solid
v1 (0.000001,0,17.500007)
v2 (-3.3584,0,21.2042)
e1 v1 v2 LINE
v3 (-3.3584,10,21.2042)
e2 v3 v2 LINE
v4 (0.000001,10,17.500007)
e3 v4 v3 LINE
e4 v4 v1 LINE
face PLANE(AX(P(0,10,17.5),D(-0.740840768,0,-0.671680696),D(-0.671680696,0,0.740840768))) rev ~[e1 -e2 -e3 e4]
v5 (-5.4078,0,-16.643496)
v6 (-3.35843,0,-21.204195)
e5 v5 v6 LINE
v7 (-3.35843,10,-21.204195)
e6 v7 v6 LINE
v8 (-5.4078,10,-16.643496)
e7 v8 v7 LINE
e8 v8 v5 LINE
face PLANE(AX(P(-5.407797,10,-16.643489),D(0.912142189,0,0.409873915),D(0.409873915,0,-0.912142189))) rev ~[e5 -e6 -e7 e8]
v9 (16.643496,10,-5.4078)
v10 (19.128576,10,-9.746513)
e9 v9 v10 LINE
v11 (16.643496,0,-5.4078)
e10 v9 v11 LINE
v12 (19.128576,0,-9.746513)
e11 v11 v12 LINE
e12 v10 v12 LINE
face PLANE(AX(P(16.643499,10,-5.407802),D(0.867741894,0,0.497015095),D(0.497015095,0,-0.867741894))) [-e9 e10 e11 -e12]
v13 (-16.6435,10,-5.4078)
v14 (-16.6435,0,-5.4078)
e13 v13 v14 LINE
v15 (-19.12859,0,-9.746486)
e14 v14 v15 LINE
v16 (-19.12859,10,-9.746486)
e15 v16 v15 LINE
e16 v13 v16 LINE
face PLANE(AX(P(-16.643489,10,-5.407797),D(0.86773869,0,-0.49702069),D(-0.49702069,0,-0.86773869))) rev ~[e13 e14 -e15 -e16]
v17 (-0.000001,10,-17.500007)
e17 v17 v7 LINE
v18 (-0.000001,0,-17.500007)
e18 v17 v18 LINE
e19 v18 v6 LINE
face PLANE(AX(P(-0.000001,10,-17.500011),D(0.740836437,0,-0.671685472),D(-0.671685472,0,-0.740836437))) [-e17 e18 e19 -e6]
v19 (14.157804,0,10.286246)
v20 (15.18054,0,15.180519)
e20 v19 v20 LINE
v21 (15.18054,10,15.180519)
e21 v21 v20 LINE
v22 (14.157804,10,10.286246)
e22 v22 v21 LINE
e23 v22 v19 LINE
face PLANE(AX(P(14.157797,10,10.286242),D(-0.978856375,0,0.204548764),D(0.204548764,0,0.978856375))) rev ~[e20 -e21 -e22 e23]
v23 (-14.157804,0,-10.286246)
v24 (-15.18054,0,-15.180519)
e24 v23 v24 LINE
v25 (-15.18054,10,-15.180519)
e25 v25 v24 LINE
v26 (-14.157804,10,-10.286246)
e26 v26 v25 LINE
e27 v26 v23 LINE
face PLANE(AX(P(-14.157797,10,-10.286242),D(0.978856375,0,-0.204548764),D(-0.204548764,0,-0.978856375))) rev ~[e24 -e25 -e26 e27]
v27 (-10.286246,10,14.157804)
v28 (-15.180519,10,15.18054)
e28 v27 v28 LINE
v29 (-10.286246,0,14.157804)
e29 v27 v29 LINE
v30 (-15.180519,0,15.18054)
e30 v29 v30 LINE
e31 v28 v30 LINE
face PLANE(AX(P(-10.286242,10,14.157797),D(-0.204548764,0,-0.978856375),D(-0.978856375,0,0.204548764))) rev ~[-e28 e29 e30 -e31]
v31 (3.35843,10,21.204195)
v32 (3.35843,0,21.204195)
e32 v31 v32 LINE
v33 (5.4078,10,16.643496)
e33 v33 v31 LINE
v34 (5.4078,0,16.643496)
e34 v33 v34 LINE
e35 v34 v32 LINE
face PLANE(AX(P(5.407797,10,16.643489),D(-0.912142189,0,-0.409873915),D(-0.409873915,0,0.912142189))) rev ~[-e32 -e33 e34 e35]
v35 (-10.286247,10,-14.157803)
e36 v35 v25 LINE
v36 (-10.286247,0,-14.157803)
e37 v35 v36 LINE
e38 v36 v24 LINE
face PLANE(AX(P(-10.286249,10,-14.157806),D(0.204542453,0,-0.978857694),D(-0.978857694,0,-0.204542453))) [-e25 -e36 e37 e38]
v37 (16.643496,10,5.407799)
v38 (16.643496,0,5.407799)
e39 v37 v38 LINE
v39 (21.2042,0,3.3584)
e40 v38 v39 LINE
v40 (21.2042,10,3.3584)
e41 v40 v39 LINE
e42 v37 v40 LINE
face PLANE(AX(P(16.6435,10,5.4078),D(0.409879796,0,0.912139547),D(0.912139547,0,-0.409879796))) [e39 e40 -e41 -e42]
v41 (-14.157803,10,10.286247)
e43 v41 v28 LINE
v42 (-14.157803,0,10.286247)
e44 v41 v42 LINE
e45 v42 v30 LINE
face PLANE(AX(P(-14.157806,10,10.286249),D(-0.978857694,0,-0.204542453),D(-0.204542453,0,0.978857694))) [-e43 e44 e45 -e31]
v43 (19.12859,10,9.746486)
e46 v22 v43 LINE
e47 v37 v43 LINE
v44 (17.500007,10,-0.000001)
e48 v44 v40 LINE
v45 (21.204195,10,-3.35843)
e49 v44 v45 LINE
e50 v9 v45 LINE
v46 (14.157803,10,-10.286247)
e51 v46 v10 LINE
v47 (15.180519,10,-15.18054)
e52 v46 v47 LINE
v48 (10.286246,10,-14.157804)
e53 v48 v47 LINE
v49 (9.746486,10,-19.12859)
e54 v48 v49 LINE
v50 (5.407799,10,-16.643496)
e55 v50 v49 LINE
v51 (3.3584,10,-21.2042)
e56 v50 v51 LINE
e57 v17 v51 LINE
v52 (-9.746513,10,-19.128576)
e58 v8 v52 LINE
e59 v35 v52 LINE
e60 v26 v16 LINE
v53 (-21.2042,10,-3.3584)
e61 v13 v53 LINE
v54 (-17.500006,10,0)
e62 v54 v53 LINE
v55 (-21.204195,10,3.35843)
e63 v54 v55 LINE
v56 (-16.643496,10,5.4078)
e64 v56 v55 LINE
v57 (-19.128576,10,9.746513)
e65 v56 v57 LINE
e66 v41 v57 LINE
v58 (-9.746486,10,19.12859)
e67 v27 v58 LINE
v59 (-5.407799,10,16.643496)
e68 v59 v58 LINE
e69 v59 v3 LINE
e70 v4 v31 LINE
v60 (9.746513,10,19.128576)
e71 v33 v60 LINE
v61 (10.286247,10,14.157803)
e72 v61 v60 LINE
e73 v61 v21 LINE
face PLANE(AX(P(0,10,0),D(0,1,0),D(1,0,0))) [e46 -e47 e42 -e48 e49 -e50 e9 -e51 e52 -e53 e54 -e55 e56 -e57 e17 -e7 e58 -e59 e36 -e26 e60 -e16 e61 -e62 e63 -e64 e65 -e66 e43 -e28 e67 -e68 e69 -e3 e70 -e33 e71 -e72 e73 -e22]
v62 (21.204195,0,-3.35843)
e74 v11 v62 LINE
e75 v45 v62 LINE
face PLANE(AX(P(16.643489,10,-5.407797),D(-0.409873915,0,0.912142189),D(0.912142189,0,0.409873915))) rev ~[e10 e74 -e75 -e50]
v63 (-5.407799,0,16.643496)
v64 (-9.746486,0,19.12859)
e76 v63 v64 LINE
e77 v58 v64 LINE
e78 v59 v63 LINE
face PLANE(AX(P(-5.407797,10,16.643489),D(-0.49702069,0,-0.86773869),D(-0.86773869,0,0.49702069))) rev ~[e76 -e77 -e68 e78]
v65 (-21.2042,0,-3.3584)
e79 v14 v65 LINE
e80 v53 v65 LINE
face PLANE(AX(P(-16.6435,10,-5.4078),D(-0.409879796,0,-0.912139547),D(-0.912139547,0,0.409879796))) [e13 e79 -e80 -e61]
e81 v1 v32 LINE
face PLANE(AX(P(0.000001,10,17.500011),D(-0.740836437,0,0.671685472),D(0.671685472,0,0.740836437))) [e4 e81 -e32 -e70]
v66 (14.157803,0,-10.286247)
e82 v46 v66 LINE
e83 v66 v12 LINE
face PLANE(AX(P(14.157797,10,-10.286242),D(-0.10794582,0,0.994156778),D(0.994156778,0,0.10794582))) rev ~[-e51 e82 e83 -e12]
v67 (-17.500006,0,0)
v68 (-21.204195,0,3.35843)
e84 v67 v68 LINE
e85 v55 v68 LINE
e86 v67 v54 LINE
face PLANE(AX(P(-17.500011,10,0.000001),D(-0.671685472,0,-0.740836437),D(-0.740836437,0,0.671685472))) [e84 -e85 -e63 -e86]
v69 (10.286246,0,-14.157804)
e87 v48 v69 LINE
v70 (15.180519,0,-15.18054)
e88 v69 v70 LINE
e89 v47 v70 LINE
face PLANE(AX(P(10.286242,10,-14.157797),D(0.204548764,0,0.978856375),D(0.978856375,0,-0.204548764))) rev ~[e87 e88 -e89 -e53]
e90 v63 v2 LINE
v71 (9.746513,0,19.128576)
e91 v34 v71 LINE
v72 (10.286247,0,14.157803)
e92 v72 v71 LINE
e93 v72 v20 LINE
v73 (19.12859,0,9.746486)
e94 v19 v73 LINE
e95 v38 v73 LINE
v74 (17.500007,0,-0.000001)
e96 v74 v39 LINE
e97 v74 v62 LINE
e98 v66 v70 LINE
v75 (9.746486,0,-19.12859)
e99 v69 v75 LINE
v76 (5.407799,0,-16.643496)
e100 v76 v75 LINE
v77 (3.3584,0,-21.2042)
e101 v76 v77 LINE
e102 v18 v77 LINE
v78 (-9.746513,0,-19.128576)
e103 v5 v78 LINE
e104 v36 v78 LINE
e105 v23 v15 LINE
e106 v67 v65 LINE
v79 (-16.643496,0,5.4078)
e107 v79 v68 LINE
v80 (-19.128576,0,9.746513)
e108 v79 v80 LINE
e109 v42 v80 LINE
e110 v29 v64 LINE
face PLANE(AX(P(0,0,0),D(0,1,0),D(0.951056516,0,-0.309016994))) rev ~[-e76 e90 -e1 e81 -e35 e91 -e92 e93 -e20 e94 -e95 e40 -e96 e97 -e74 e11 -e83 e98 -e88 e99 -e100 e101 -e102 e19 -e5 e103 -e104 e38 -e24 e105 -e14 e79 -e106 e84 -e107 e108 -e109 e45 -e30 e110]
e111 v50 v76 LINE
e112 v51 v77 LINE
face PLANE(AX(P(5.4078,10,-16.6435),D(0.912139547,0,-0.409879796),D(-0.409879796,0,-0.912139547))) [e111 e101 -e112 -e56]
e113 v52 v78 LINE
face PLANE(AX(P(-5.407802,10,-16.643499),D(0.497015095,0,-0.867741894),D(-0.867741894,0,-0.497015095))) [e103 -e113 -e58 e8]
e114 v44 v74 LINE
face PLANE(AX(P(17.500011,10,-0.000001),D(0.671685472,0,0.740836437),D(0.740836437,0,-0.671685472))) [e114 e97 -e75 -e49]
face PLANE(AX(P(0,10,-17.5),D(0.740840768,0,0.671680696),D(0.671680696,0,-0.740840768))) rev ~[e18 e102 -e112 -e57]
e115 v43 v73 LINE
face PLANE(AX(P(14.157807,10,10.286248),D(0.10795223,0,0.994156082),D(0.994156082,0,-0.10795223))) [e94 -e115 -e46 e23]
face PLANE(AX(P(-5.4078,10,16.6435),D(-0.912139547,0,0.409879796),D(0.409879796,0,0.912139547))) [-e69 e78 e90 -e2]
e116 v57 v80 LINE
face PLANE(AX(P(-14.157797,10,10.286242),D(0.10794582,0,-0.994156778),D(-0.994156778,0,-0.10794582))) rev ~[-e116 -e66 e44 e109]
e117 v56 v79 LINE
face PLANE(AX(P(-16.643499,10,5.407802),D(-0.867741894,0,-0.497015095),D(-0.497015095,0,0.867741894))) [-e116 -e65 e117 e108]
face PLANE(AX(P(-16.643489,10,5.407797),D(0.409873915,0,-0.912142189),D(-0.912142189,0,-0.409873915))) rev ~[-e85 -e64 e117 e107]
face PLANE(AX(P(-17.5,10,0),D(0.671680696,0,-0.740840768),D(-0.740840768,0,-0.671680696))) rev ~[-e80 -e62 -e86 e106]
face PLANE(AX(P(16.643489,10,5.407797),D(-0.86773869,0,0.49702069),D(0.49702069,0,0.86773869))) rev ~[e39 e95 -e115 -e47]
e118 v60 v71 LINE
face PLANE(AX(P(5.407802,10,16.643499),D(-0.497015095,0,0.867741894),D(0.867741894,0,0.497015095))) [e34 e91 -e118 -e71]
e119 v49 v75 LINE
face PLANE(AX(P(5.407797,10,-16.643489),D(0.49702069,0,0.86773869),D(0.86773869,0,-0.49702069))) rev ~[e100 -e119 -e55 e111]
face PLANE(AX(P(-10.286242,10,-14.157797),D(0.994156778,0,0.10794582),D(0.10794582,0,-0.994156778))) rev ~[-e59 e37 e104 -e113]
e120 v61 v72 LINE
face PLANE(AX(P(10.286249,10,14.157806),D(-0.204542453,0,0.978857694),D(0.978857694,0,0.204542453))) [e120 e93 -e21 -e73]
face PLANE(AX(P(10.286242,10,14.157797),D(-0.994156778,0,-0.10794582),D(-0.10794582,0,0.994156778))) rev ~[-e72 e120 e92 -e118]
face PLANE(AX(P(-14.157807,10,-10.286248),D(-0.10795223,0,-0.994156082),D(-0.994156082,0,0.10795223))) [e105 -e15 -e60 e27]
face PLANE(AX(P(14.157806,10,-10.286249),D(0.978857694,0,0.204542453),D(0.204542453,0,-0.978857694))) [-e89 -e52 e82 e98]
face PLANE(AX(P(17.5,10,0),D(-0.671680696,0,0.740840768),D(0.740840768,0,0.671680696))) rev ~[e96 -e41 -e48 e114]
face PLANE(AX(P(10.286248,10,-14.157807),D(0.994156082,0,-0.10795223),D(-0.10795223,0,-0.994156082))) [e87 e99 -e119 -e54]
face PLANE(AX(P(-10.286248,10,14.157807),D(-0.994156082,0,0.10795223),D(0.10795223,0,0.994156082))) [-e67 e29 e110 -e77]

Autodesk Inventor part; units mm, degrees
ref_plane "YZ Plane" through (0, 0, 0) normal (1, 0, 0) x (0, 1, 0)
ref_plane "XZ Plane" through (0, 0, 0) normal (0, 1, 0) x (-1, 0, 0)
ref_plane "XY Plane" through (0, 0, 0) normal (0, 0, 1) x (1, 0, 0)
sketch "Sketch1" plane through (0, 0, 0) normal (0, 1, 0) x (-1, 0, 0)
  circle A0 centre (0, 0) radius 17.5
  dimension "d0" = 35
extrude "Base" add sketch "Sketch1" along normal blind 10
sketch "Sketch2" plane through (0, 10, 0) normal (0, 1, 0) x (1, 0, 0)
  circle A0 centre (0, 0) radius 8
  circle A1 centre (-8, 0) radius 0.8
  dimension "d3" = 16
  dimension "d4" = 1.6
extrude "Mounting Hole" cut sketch "Sketch2" against normal through all contours A1 A0 | A0 A1 picked at (-7.7304, 0) picked at (-8.2616, 0.0332)
pattern_circular "Circular Pattern1" count 8 over 360 about axis through (0, 0, 0) along (0, 1, 0) of "Mounting Hole"
sketch "Sketch3" plane through (0, 10, 0) normal (0, 1, 0) x (1, 0, 0)
  arc A0 (-16.6435, 5.4078) -> (-17.5, 0) centre (0, 0) ccw
  line L0 (0, 0) -> (-16.6435, 5.4078) construction
  line L1 (0, 0) -> (-17.5, 0) construction
  line L2 (0, 0) -> (-25.2614, 4.001)
  line L3 (0, 0) -> (25.5763, 0) construction
  line L4 (-17.5, 0) -> (-21.2042, 3.3584)
  line L5 (-16.6435, 5.4078) -> (-21.2042, 3.3584)
  dimension "d11" = 18
  dimension "d12" = 171
  dimension "d13" = 5
extrude "Gear Tooth" add sketch "Sketch3" against normal blind 10
pattern_circular "Circular Pattern2" count 20 over 360 about axis through (0, 0, 0) along (0, 1, 0) of "Gear Tooth"
sketch "Sketch6" plane through (0, 10, 0) normal (0, 1, 0) x (1, 0, 0)
  point P0 (0, 0)
sketch "Sketch7" plane through (0, 10, 0) normal (0, 1, 0) x (1, 0, 0)
  circle A0 centre (0, 0) radius 10
  dimension "d26" = 20
extrude "Extrusion6" cut sketch "Sketch7" against normal blind 2
sketch "Sketch8" plane through (0, 8, 0) normal (0, 1, 0) x (1, 0, 0)
  circle A0 centre (0, 0) radius 4
  dimension "d29" = 8
extrude "Extrusion7" cut sketch "Sketch8" against normal blind 1.9
sketch "Sketch9" plane through (0, 6.1, 0) normal (0, 1, 0) x (1, 0, 0)
  circle A0 centre (0, 0) radius 2.25
  dimension "d32" = 4.5
extrude "Extrusion8" cut sketch "Sketch9" against normal blind 2.5
sketch "Sketch10" plane through (0, 10, 0) normal (0, 1, 0) x (1, 0, 0)
  circle A0 centre (0, 0) radius 10
extrude "Extrusion9" add sketch "Sketch10" against normal blind 10
properties part number "BarMountSmallGear"
